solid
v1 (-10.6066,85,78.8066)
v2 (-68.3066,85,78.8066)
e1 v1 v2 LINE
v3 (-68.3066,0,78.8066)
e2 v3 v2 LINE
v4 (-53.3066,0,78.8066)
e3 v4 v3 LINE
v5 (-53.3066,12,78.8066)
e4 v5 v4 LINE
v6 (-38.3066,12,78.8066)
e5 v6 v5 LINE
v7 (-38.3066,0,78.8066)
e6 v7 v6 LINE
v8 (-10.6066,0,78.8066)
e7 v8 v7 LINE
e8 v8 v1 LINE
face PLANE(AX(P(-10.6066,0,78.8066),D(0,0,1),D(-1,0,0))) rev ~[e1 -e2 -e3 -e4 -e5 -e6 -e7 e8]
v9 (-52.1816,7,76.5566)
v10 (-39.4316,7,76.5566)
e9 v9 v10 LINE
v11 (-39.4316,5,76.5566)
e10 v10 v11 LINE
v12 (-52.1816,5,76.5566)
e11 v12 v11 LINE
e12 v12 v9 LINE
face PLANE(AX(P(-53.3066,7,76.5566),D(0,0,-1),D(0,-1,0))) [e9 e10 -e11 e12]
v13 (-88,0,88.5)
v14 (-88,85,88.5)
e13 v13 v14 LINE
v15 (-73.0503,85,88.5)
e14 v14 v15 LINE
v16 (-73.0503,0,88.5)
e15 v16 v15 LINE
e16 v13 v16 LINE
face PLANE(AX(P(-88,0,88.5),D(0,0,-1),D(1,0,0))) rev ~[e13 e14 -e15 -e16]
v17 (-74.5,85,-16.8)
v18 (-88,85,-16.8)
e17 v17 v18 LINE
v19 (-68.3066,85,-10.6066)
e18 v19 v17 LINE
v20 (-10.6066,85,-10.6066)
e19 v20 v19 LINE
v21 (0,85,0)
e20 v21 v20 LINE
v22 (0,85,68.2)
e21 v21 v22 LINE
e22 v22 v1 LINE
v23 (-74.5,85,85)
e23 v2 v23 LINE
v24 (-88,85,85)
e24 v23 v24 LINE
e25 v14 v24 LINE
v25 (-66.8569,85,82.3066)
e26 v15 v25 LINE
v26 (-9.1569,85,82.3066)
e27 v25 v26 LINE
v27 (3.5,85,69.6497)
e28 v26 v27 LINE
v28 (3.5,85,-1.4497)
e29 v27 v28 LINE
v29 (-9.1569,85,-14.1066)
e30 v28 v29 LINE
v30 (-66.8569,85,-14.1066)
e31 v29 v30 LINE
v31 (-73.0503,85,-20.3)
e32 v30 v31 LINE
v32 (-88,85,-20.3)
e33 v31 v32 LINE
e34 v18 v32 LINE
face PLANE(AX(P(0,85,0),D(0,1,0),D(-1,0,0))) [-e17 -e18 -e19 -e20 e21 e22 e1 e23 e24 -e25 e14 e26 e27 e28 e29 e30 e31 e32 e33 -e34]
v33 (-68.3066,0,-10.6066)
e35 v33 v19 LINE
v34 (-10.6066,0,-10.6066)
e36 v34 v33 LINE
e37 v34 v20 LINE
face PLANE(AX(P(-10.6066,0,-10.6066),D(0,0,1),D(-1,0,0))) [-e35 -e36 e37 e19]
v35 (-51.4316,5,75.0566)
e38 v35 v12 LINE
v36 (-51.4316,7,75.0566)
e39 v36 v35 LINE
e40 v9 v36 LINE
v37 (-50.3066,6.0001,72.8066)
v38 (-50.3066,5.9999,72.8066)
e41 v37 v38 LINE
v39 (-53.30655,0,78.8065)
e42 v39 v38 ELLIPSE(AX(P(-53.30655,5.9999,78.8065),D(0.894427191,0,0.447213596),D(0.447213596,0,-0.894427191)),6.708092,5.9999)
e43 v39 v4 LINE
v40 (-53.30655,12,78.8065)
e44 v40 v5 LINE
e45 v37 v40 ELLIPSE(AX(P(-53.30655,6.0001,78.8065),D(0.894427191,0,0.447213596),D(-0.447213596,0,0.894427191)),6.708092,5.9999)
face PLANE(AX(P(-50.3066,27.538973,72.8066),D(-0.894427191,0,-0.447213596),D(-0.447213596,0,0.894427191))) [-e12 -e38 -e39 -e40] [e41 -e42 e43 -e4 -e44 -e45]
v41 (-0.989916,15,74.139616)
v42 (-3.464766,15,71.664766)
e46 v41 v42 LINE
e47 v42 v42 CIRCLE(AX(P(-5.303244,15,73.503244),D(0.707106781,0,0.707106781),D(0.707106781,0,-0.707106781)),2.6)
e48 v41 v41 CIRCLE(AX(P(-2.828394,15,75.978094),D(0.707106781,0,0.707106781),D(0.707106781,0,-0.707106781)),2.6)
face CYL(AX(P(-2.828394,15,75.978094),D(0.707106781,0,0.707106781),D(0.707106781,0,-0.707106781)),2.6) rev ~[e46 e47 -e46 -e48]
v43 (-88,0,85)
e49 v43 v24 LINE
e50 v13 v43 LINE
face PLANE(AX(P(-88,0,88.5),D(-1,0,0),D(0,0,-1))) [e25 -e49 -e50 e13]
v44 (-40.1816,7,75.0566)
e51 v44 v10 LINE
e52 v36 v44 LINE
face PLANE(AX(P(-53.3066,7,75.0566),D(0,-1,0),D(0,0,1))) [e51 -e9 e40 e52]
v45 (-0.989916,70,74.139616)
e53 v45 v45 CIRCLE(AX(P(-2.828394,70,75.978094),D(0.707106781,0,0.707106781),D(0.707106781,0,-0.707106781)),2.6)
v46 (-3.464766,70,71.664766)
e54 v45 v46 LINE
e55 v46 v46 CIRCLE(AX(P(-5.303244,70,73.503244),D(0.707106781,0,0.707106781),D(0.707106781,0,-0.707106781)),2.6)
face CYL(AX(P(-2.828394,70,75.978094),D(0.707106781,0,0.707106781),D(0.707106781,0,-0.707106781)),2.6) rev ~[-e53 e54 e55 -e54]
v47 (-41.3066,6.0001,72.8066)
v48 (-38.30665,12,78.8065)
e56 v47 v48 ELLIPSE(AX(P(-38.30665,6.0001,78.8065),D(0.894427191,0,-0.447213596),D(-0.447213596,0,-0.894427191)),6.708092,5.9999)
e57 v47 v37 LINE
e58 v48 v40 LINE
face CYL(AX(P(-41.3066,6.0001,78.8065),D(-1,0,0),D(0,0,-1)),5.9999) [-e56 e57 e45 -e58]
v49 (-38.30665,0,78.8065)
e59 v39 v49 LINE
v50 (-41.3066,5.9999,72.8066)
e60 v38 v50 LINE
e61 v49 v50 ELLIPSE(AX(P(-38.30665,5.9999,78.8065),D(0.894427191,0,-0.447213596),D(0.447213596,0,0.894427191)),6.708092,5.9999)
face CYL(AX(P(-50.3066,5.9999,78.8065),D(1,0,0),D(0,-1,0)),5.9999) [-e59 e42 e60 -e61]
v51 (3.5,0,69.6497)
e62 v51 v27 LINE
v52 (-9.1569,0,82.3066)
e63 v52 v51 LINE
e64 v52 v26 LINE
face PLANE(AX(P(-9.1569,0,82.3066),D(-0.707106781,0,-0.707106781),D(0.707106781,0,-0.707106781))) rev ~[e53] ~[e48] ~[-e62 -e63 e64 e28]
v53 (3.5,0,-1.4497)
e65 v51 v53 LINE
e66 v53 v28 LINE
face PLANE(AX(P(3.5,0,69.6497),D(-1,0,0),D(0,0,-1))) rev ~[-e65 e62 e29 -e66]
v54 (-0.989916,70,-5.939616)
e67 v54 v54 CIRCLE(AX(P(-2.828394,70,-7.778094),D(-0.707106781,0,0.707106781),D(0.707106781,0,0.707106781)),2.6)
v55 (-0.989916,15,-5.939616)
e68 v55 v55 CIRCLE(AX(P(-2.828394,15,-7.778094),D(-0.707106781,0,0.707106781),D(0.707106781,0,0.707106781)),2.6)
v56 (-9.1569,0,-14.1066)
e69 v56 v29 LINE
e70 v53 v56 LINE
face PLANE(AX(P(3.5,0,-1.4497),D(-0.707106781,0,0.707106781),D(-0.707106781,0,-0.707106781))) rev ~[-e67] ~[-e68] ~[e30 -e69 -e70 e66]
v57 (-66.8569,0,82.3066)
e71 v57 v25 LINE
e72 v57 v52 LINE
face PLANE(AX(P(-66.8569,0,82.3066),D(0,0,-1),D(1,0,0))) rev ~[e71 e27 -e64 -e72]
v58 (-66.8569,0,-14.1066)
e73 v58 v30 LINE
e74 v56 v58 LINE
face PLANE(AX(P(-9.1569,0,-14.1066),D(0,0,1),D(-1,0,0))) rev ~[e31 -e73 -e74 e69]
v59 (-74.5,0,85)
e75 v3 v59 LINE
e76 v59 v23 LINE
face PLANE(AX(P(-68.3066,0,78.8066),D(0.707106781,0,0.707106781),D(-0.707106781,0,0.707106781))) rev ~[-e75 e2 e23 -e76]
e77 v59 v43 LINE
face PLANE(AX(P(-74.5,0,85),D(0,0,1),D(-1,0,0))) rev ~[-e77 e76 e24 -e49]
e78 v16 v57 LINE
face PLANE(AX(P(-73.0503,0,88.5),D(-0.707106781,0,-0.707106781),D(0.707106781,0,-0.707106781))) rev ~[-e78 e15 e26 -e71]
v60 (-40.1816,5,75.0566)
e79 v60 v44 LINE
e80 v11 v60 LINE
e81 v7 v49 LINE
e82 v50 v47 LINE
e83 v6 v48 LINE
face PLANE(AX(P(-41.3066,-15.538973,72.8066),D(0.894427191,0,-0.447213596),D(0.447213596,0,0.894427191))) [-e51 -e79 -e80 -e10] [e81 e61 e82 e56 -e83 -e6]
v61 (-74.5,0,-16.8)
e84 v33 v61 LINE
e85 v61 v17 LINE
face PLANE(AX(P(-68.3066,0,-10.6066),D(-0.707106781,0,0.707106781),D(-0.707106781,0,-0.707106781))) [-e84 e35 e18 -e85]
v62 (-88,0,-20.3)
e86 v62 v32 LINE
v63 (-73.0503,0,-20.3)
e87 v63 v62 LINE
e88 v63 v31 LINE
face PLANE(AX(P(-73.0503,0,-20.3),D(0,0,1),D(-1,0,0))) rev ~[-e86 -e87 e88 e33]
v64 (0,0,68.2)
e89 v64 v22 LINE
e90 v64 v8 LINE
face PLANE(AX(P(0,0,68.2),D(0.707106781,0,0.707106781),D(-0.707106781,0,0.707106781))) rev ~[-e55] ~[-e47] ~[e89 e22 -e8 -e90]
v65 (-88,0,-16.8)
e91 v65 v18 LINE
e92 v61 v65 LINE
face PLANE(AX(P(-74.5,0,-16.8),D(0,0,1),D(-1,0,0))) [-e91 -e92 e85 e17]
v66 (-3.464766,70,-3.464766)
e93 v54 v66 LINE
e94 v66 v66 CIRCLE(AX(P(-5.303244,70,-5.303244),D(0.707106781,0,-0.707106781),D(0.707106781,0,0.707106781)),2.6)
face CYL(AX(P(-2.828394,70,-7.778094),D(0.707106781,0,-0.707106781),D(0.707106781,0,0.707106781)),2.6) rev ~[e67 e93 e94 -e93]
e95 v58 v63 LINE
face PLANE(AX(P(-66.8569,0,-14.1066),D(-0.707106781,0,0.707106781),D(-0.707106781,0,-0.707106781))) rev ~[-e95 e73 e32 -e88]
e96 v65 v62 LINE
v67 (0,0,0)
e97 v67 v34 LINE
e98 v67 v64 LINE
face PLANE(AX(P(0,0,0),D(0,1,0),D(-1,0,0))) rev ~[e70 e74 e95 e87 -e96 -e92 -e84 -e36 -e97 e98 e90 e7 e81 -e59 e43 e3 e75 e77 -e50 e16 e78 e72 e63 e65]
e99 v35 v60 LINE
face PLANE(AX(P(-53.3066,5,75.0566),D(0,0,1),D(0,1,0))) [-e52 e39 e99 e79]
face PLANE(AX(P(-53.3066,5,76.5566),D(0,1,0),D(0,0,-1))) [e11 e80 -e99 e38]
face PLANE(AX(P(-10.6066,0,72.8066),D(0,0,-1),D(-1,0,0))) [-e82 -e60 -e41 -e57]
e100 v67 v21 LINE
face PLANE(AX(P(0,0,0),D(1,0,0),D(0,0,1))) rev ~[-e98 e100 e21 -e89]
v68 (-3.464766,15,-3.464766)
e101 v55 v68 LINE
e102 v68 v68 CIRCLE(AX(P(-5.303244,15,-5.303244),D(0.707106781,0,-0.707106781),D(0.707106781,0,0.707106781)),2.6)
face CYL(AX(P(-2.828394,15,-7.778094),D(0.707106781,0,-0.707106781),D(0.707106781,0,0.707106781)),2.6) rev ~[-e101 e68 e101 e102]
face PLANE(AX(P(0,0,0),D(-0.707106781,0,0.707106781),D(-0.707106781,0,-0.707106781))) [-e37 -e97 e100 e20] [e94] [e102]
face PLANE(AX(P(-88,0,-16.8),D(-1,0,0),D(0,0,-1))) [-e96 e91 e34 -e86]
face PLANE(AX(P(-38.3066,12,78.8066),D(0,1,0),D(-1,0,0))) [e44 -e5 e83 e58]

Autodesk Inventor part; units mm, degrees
ref_plane "YZ Plane" through (0, 0, 0) normal (1, 0, 0) x (0, 1, 0)
ref_plane "XZ Plane" through (0, 0, 0) normal (0, 1, 0) x (-1, 0, 0)
sketch "Sketch1" plane through (0, 0, 0) normal (0, 1, 0) x (-1, 0, 0)
  line L0 (0, 0) -> (0, 68.2)
  line L1 (0, 68.2) -> (10.6066, 78.8066)
  line L2 (10.6066, 78.8066) -> (68.3066, 78.8066)
  line L3 (68.3066, 78.8066) -> (74.5, 85)
  line L4 (74.5, 85) -> (88, 85)
  line L5 (0, 34.1) -> (80, 34.1) construction
  line L6 (0, 0) -> (10.6066, -10.6066)
  line L7 (10.6066, -10.6066) -> (68.3066, -10.6066)
  line L8 (68.3066, -10.6066) -> (74.5, -16.8)
  line L9 (74.5, -16.8) -> (88, -16.8)
  line L10 (88, 88.5) -> (73.0503, 88.5)
  line L11 (73.0503, 88.5) -> (66.8569, 82.3066)
  line L12 (66.8569, 82.3066) -> (9.1569, 82.3066)
  line L13 (9.1569, 82.3066) -> (-3.5, 69.6497)
  line L14 (-3.5, 69.6497) -> (-3.5, -1.4497)
  line L15 (-3.5, -1.4497) -> (9.1569, -14.1066)
  line L16 (9.1569, -14.1066) -> (66.8569, -14.1066)
  line L17 (66.8569, -14.1066) -> (73.0503, -20.3)
  line L18 (73.0503, -20.3) -> (88, -20.3)
  line L19 (88, 88.5) -> (88, 85)
  line L20 (88, -16.8) -> (88, -20.3)
  dimension "d0" = 68.2
  dimension "d1" = 15
  dimension "d2" = 135
  dimension "d5" = 135
  dimension "d6" = 88
  dimension "d7" = 3.5
  dimension "d18" = 13.5
  dimension "d19" = 50.9
extrude "Extrusion1" add sketch "Sketch1" along normal blind 85
sketch "Sketch2" plane through (3.5, 0, 69.6497) normal (0.7071068, 0, 0.7071068) x (0.7071068, 0, -0.7071068)
  line L0 (-17.8995, 0) -> (0, 0) projected
  line L1 (0, 0) -> (0, 85) projected
  line L2 (-17.8995, 85) -> (0, 85) projected
  line L3 (-17.8995, 0) -> (-17.8995, 85) projected
  line L4 (-1.4497, 85) -> (-16.4497, 85) construction
  line L5 (-8.9497, 85) -> (-8.9497, 0) construction
  line L6 (-17.8995, 0) -> (0, 0) construction
  circle A0 centre (-8.9497, 70) radius 2.6
  circle A1 centre (-8.9497, 15) radius 2.6
  point P0 (46.7749, 0)
  dimension "d10" = 5.2
  dimension "d11" = 5.2
  dimension "d12" = 15
  dimension "d13" = 15
extrude "Extrusion2" cut sketch "Sketch2" against normal up to next contours A0 | A1
ref_plane "Work Plane1" through (-88, 0, 34.1) normal (0, 0, 1) x (1, 0, 0)
mirror "Mirror1" about plane through (-88, 0, 34.1) normal (0, 0, 1) of "Extrusion2"
sketch "Sketch4" plane through (-10.6066, 0, 78.8066) normal (0, 0, -1) x (-1, 0, 0)
  line L0 (27.7, 12) -> (42.7, 12)
  line L1 (42.7, 12) -> (42.7, 0)
  line L2 (42.7, 0) -> (27.7, 0)
  line L3 (27.7, 0) -> (27.7, 12)
  line L4 (0, 85) -> (57.7, 85) projected
  line L5 (57.7, 0) -> (57.7, 85) projected
  line L6 (0, 0) -> (57.7, 0) projected
  point P0 (-10.6066, 0)
  dimension "d20" = 15
  dimension "d21" = 12
  dimension "d22" = 15
extrude "Extrusion4" add sketch "Sketch4" along normal blind 6
sketch "Sketch5" plane through (-53.3066, 0, 78.8066) normal (-1, 0, 0) x (0, 0, 1)
  line L0 (0, 12) -> (0, 0) projected
  line L1 (0, 12) -> (-6, 12) projected
  line L2 (-6, 0) -> (-6, 12) projected
  line L3 (0, 0) -> (-6, 0) projected
  line L4 (-3.75, 7) -> (-2.25, 7)
  line L5 (-2.25, 7) -> (-2.25, 5)
  line L6 (-2.25, 5) -> (-3.75, 5)
  line L7 (-3.75, 5) -> (-3.75, 7)
  line L8 (-6, 0) -> (-6, 12) construction
  line L9 (-6, 6) -> (-3.75, 6) construction
  line L10 (0, 12) -> (-6, 12) construction
  line L11 (-3, 12) -> (-3, 7) construction
  point P0 (-78.8066, 0)
  dimension "d25" = 1.5
  dimension "d26" = 2
extrude "Extrusion5" cut sketch "Sketch5" against normal up to next contours L4 L5 L6 L7
chamfer "Chamfer1" distance 3 distance2 6 1 edges at (-53.3066, 6, 72.8066) measured on face at (-43.3066, 8, 72.8066)
chamfer "Chamfer2" distance 3 distance2 6 1 edges at (-38.3066, 6, 72.8066) measured on face at (-42.3066, 8, 72.8066)
fillet "Fillet1" radius 6 2 edges at (-45.8066, 12, 72.8066) (-45.8066, 0, 72.8066)
equation "\"d11\" = d10"
equation "\"d13\" = d12"
properties part number "Z Axis Cover Bottom"
